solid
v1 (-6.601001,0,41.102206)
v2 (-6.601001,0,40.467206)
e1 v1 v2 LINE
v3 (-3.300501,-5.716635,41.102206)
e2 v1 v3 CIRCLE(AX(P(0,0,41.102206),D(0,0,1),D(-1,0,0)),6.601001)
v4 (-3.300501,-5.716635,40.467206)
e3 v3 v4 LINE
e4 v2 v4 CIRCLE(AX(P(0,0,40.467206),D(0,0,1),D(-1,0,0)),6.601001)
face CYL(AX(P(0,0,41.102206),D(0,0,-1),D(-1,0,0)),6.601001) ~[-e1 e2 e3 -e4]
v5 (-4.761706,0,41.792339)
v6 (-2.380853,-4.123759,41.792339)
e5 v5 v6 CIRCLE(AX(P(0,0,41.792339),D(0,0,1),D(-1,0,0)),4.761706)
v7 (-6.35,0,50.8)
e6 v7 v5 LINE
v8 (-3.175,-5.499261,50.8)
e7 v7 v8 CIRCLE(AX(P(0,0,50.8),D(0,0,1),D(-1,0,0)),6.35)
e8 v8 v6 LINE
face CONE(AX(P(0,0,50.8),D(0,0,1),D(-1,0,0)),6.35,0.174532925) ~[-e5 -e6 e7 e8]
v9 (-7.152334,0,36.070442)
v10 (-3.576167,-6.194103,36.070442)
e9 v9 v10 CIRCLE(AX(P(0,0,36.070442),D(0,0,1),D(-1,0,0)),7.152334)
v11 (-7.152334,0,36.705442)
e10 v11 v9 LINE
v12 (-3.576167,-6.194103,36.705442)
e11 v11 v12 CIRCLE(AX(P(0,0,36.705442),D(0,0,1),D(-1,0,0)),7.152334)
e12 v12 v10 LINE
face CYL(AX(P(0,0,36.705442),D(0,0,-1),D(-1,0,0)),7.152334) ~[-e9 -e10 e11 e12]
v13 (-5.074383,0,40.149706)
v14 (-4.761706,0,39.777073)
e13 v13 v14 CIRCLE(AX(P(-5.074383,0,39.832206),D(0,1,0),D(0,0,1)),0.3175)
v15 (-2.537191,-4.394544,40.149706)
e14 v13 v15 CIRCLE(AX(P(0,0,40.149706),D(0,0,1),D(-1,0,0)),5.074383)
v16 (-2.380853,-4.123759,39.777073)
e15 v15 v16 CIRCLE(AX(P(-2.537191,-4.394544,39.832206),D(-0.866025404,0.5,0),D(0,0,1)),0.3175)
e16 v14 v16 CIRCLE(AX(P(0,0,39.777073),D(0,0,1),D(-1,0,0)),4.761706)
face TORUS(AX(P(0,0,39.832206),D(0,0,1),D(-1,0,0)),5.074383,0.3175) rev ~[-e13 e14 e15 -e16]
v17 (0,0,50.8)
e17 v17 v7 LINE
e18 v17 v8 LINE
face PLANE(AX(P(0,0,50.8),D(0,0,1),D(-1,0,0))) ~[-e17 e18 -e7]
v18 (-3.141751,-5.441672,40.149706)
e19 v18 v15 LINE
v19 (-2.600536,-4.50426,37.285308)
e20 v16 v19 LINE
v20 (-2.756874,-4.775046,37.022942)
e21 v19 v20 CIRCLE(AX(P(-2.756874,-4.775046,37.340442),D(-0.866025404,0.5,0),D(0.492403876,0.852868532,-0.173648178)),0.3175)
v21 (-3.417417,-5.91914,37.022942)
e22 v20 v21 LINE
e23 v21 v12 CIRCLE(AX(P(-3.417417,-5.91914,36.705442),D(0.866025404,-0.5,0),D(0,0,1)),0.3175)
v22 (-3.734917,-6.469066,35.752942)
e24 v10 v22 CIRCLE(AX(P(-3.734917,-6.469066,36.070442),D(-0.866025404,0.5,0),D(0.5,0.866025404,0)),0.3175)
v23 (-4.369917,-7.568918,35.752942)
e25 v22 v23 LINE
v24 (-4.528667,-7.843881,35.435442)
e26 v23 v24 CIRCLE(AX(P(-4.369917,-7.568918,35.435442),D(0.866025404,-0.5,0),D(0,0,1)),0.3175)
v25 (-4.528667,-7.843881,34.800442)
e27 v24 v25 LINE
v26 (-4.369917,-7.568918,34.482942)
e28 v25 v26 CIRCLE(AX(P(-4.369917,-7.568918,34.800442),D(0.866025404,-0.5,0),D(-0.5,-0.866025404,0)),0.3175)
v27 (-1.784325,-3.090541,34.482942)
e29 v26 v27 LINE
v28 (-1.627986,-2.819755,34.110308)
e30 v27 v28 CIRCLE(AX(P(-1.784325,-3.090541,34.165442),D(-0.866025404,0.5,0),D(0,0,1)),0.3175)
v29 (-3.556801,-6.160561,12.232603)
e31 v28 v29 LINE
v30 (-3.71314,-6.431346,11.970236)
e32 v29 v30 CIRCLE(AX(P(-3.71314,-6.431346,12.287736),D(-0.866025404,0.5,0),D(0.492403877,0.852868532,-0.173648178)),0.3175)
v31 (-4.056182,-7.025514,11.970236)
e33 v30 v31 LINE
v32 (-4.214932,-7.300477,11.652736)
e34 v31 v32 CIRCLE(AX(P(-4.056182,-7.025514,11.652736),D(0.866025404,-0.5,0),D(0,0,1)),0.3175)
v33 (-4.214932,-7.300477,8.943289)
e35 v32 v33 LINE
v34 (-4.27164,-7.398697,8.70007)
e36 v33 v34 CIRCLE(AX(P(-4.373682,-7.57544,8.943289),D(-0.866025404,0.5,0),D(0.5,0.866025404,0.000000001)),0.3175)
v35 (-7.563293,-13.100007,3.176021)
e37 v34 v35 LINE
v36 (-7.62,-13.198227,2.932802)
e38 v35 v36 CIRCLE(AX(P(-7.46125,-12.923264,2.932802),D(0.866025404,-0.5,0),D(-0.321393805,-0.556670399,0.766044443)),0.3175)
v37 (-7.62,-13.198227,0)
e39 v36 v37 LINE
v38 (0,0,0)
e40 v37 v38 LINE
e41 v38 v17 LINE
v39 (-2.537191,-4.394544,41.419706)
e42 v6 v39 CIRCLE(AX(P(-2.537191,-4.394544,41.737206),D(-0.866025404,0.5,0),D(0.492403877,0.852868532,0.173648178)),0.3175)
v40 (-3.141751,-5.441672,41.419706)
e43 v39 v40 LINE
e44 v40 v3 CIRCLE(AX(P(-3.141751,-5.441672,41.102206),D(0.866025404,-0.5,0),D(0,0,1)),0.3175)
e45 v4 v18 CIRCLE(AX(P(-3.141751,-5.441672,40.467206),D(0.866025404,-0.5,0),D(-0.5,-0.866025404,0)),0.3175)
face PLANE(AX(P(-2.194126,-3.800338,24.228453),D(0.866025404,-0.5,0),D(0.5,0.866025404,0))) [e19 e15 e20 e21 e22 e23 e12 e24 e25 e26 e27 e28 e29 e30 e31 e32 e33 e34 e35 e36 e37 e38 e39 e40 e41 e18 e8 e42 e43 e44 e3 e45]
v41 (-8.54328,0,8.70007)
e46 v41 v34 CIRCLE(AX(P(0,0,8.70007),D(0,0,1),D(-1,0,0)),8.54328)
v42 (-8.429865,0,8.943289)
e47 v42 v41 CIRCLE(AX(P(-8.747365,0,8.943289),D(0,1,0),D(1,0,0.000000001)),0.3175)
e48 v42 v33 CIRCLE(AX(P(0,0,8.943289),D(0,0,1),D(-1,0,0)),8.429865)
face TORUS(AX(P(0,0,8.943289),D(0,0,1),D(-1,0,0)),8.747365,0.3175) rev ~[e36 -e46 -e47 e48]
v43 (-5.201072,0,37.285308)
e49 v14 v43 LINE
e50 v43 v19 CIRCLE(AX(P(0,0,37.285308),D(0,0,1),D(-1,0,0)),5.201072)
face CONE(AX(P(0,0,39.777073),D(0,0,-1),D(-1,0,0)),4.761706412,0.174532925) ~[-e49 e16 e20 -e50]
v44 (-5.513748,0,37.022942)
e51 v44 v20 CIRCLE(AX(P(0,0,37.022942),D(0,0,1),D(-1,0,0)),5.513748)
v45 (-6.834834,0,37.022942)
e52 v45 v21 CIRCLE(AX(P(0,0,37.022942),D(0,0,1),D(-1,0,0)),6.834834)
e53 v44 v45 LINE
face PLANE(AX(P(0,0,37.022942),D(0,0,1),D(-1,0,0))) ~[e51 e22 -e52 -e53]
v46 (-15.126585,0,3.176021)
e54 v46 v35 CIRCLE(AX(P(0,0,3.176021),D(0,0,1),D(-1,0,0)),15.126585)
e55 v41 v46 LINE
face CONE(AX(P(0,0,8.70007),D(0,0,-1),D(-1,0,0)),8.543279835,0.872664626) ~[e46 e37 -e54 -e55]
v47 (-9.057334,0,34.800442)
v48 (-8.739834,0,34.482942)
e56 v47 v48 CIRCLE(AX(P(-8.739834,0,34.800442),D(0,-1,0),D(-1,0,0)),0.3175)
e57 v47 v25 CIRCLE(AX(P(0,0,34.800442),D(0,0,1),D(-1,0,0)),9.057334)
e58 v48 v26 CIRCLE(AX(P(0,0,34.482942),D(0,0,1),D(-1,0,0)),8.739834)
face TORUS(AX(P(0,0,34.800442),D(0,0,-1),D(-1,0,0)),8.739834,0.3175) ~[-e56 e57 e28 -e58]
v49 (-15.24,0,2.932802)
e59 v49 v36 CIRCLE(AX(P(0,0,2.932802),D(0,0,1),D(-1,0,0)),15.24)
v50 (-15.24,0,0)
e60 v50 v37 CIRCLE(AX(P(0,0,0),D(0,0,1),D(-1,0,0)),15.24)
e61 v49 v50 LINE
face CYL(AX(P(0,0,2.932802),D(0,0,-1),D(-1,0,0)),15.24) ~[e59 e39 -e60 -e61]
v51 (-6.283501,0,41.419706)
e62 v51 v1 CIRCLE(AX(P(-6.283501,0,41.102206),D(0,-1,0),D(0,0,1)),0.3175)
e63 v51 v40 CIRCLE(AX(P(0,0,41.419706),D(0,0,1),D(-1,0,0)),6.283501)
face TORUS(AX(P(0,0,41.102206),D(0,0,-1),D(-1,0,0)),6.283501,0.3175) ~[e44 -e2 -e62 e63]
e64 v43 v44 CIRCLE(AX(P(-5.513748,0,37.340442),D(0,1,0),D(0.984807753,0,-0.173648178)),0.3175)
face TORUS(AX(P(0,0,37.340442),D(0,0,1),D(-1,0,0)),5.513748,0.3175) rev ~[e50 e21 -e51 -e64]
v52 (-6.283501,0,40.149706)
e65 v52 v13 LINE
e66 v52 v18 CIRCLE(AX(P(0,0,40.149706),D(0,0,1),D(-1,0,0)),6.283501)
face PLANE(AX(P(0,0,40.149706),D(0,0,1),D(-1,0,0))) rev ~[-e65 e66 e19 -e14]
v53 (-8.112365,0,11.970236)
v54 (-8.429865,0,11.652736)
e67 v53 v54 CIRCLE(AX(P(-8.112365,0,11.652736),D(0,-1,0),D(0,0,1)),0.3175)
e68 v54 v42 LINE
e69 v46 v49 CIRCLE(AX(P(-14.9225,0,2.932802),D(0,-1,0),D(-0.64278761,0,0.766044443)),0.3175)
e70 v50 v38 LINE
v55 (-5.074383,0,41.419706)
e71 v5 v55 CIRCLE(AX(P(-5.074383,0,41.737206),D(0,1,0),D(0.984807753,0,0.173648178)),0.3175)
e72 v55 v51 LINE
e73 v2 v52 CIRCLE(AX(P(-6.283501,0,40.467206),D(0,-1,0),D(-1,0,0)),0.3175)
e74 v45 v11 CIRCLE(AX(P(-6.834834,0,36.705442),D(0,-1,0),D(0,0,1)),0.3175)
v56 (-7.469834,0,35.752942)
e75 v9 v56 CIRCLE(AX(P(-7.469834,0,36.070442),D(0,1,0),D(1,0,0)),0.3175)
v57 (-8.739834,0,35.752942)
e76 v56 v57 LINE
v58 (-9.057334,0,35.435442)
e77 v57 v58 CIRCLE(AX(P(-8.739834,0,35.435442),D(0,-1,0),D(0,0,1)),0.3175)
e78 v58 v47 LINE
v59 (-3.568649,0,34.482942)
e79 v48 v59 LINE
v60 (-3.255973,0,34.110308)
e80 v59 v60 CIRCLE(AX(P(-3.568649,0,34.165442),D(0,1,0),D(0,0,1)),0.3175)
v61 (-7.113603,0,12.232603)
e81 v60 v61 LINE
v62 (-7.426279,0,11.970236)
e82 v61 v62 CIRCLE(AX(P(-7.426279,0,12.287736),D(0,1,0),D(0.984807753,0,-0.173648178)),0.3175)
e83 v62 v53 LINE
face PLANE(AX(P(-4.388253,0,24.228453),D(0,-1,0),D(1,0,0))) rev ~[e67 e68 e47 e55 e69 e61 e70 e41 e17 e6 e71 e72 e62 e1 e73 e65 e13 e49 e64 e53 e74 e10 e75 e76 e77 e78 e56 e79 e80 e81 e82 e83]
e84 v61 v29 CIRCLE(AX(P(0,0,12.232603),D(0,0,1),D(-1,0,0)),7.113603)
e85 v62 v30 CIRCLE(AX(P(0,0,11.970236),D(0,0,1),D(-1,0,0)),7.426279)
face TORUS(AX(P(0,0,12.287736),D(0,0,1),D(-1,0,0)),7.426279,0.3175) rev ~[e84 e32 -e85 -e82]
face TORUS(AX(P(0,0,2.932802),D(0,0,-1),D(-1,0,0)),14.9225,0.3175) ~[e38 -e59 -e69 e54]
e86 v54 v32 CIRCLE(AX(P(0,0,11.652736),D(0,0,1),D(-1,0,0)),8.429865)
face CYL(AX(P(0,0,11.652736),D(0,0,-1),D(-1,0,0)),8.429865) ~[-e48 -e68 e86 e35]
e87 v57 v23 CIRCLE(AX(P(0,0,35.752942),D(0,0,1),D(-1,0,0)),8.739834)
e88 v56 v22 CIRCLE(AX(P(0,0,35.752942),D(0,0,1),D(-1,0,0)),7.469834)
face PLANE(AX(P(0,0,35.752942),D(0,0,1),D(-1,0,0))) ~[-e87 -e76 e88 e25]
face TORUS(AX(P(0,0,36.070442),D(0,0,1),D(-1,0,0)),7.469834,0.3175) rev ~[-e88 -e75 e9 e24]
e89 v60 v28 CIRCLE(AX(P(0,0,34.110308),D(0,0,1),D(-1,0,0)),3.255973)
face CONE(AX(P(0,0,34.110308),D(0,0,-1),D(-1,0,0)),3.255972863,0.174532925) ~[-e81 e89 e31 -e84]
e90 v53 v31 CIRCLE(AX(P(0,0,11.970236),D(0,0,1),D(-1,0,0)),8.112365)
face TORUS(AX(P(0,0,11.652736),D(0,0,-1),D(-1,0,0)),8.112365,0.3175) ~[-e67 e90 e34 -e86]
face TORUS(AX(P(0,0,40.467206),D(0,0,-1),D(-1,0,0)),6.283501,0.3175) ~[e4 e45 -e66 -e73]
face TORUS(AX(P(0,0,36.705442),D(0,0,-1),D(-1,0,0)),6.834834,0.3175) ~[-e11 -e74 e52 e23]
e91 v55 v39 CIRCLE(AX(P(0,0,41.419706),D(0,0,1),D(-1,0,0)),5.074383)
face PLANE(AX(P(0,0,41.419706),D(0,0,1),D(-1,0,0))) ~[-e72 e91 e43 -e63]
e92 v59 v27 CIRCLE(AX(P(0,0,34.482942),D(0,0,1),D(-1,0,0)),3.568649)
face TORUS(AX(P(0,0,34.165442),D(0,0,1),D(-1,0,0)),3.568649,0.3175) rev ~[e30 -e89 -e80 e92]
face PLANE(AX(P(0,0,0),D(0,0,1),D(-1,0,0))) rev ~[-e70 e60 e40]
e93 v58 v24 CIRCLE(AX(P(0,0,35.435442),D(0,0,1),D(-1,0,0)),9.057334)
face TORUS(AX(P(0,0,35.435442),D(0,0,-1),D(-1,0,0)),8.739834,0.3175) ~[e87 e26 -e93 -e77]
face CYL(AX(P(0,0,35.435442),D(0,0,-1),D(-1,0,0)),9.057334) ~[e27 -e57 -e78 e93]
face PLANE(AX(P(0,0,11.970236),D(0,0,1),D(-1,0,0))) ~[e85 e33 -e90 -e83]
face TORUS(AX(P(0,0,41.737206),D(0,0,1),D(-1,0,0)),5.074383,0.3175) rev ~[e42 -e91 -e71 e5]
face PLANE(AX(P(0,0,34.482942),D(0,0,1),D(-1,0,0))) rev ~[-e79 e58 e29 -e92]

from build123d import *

# Parameters (mm, degrees)
F1_ANGLE = 60


# Not quite as in the source:
# - a feature of the source that left no trace in its solid (it failed there, or was rolled back) is left out


with BuildPart() as f1:
    # F0 (on Front) → F1 (revolve)
    with BuildSketch(Plane.XZ):
        with BuildLine():
            Line((-15.24, 0), (0, 0))
            Line((0, 0), (0, 50.8))
            Line((0, 50.8), (-6.35, 50.8))
            Line((-6.35, 50.8), (-4.7617064118, 41.792339449))
            ThreePointArc((-4.7617064118, 41.792339449), (-4.8311637627, 41.5331210865), (-5.0743828734, 41.4197061526))
            Line((-5.0743828734, 41.4197061526), (-6.2835011077, 41.4197061526))
            ThreePointArc((-6.2835011077, 41.4197061526), (-6.5080075107, 41.3267125556), (-6.6010011077, 41.1022061526))
            Line((-6.6010011077, 41.1022061526), (-6.6010011077, 40.4672061526))
            ThreePointArc((-6.6010011077, 40.4672061526), (-6.5080075107, 40.2426997495), (-6.2835011077, 40.1497061526))
            Line((-6.2835011077, 40.1497061526), (-5.0743828734, 40.1497061526))
            ThreePointArc((-5.0743828734, 40.1497061526), (-4.8311637627, 40.0362912186), (-4.7617064118, 39.7770728561))
            Line((-4.7617064118, 39.7770728561), (-5.2010717431, 37.2853082403))
            ThreePointArc((-5.2010717431, 37.2853082403), (-5.3096631386, 37.0972224261), (-5.5137482047, 37.0229415367))
            Line((-5.5137482047, 37.0229415367), (-6.8348340718, 37.0229415367))
            ThreePointArc((-6.8348340718, 37.0229415367), (-7.0593404748, 36.9299479398), (-7.1523340718, 36.7054415367))
            Line((-7.1523340718, 36.7054415367), (-7.1523340718, 36.0704415367))
            ThreePointArc((-7.1523340718, 36.0704415367), (-7.2453276688, 35.8459351337), (-7.4698340718, 35.7529415367))
            Line((-7.4698340718, 35.7529415367), (-8.7398340718, 35.7529415367))
            ThreePointArc((-8.7398340718, 35.7529415367), (-8.9643404748, 35.6599479398), (-9.0573340718, 35.4354415367))
            Line((-9.0573340718, 35.4354415367), (-9.0573340718, 34.8004415367))
            ThreePointArc((-9.0573340718, 34.8004415367), (-8.9643404748, 34.5759351337), (-8.7398340718, 34.4829415367))
            Line((-8.7398340718, 34.4829415367), (-3.5686493249, 34.4829415367))
            ThreePointArc((-3.5686493249, 34.4829415367), (-3.3254302142, 34.3695266028), (-3.2559728633, 34.1103082403))
            Line((-3.2559728633, 34.1103082403), (-7.113602572, 12.2326030065))
            ThreePointArc((-7.113602572, 12.2326030065), (-7.2221939675, 12.0445171922), (-7.4262790336, 11.9702363029))
            Line((-7.4262790336, 11.9702363029), (-8.1123649007, 11.9702363029))
            ThreePointArc((-8.1123649007, 11.9702363029), (-8.3368713037, 11.8772427059), (-8.4298649007, 11.6527363029))
            Line((-8.4298649007, 11.6527363029), (-8.4298649007, 8.9432889844))
            ThreePointArc((-8.4298649007, 8.9432889844), (-8.4596121783, 8.8091076862), (-8.5432798346, 8.7000698737))
            Line((-8.5432798346, 8.7000698737), (-15.1265850661, 3.176020882))
            ThreePointArc((-15.1265850661, 3.176020882), (-15.2102527224, 3.0669830694), (-15.24, 2.9328017713))
            Line((-15.24, 2.9328017713), (-15.24, 0))
        make_face()
    revolve(axis=Axis((0, 0, 25.4), (0, 0, 1)), revolution_arc=F1_ANGLE)


solid = f1.part
